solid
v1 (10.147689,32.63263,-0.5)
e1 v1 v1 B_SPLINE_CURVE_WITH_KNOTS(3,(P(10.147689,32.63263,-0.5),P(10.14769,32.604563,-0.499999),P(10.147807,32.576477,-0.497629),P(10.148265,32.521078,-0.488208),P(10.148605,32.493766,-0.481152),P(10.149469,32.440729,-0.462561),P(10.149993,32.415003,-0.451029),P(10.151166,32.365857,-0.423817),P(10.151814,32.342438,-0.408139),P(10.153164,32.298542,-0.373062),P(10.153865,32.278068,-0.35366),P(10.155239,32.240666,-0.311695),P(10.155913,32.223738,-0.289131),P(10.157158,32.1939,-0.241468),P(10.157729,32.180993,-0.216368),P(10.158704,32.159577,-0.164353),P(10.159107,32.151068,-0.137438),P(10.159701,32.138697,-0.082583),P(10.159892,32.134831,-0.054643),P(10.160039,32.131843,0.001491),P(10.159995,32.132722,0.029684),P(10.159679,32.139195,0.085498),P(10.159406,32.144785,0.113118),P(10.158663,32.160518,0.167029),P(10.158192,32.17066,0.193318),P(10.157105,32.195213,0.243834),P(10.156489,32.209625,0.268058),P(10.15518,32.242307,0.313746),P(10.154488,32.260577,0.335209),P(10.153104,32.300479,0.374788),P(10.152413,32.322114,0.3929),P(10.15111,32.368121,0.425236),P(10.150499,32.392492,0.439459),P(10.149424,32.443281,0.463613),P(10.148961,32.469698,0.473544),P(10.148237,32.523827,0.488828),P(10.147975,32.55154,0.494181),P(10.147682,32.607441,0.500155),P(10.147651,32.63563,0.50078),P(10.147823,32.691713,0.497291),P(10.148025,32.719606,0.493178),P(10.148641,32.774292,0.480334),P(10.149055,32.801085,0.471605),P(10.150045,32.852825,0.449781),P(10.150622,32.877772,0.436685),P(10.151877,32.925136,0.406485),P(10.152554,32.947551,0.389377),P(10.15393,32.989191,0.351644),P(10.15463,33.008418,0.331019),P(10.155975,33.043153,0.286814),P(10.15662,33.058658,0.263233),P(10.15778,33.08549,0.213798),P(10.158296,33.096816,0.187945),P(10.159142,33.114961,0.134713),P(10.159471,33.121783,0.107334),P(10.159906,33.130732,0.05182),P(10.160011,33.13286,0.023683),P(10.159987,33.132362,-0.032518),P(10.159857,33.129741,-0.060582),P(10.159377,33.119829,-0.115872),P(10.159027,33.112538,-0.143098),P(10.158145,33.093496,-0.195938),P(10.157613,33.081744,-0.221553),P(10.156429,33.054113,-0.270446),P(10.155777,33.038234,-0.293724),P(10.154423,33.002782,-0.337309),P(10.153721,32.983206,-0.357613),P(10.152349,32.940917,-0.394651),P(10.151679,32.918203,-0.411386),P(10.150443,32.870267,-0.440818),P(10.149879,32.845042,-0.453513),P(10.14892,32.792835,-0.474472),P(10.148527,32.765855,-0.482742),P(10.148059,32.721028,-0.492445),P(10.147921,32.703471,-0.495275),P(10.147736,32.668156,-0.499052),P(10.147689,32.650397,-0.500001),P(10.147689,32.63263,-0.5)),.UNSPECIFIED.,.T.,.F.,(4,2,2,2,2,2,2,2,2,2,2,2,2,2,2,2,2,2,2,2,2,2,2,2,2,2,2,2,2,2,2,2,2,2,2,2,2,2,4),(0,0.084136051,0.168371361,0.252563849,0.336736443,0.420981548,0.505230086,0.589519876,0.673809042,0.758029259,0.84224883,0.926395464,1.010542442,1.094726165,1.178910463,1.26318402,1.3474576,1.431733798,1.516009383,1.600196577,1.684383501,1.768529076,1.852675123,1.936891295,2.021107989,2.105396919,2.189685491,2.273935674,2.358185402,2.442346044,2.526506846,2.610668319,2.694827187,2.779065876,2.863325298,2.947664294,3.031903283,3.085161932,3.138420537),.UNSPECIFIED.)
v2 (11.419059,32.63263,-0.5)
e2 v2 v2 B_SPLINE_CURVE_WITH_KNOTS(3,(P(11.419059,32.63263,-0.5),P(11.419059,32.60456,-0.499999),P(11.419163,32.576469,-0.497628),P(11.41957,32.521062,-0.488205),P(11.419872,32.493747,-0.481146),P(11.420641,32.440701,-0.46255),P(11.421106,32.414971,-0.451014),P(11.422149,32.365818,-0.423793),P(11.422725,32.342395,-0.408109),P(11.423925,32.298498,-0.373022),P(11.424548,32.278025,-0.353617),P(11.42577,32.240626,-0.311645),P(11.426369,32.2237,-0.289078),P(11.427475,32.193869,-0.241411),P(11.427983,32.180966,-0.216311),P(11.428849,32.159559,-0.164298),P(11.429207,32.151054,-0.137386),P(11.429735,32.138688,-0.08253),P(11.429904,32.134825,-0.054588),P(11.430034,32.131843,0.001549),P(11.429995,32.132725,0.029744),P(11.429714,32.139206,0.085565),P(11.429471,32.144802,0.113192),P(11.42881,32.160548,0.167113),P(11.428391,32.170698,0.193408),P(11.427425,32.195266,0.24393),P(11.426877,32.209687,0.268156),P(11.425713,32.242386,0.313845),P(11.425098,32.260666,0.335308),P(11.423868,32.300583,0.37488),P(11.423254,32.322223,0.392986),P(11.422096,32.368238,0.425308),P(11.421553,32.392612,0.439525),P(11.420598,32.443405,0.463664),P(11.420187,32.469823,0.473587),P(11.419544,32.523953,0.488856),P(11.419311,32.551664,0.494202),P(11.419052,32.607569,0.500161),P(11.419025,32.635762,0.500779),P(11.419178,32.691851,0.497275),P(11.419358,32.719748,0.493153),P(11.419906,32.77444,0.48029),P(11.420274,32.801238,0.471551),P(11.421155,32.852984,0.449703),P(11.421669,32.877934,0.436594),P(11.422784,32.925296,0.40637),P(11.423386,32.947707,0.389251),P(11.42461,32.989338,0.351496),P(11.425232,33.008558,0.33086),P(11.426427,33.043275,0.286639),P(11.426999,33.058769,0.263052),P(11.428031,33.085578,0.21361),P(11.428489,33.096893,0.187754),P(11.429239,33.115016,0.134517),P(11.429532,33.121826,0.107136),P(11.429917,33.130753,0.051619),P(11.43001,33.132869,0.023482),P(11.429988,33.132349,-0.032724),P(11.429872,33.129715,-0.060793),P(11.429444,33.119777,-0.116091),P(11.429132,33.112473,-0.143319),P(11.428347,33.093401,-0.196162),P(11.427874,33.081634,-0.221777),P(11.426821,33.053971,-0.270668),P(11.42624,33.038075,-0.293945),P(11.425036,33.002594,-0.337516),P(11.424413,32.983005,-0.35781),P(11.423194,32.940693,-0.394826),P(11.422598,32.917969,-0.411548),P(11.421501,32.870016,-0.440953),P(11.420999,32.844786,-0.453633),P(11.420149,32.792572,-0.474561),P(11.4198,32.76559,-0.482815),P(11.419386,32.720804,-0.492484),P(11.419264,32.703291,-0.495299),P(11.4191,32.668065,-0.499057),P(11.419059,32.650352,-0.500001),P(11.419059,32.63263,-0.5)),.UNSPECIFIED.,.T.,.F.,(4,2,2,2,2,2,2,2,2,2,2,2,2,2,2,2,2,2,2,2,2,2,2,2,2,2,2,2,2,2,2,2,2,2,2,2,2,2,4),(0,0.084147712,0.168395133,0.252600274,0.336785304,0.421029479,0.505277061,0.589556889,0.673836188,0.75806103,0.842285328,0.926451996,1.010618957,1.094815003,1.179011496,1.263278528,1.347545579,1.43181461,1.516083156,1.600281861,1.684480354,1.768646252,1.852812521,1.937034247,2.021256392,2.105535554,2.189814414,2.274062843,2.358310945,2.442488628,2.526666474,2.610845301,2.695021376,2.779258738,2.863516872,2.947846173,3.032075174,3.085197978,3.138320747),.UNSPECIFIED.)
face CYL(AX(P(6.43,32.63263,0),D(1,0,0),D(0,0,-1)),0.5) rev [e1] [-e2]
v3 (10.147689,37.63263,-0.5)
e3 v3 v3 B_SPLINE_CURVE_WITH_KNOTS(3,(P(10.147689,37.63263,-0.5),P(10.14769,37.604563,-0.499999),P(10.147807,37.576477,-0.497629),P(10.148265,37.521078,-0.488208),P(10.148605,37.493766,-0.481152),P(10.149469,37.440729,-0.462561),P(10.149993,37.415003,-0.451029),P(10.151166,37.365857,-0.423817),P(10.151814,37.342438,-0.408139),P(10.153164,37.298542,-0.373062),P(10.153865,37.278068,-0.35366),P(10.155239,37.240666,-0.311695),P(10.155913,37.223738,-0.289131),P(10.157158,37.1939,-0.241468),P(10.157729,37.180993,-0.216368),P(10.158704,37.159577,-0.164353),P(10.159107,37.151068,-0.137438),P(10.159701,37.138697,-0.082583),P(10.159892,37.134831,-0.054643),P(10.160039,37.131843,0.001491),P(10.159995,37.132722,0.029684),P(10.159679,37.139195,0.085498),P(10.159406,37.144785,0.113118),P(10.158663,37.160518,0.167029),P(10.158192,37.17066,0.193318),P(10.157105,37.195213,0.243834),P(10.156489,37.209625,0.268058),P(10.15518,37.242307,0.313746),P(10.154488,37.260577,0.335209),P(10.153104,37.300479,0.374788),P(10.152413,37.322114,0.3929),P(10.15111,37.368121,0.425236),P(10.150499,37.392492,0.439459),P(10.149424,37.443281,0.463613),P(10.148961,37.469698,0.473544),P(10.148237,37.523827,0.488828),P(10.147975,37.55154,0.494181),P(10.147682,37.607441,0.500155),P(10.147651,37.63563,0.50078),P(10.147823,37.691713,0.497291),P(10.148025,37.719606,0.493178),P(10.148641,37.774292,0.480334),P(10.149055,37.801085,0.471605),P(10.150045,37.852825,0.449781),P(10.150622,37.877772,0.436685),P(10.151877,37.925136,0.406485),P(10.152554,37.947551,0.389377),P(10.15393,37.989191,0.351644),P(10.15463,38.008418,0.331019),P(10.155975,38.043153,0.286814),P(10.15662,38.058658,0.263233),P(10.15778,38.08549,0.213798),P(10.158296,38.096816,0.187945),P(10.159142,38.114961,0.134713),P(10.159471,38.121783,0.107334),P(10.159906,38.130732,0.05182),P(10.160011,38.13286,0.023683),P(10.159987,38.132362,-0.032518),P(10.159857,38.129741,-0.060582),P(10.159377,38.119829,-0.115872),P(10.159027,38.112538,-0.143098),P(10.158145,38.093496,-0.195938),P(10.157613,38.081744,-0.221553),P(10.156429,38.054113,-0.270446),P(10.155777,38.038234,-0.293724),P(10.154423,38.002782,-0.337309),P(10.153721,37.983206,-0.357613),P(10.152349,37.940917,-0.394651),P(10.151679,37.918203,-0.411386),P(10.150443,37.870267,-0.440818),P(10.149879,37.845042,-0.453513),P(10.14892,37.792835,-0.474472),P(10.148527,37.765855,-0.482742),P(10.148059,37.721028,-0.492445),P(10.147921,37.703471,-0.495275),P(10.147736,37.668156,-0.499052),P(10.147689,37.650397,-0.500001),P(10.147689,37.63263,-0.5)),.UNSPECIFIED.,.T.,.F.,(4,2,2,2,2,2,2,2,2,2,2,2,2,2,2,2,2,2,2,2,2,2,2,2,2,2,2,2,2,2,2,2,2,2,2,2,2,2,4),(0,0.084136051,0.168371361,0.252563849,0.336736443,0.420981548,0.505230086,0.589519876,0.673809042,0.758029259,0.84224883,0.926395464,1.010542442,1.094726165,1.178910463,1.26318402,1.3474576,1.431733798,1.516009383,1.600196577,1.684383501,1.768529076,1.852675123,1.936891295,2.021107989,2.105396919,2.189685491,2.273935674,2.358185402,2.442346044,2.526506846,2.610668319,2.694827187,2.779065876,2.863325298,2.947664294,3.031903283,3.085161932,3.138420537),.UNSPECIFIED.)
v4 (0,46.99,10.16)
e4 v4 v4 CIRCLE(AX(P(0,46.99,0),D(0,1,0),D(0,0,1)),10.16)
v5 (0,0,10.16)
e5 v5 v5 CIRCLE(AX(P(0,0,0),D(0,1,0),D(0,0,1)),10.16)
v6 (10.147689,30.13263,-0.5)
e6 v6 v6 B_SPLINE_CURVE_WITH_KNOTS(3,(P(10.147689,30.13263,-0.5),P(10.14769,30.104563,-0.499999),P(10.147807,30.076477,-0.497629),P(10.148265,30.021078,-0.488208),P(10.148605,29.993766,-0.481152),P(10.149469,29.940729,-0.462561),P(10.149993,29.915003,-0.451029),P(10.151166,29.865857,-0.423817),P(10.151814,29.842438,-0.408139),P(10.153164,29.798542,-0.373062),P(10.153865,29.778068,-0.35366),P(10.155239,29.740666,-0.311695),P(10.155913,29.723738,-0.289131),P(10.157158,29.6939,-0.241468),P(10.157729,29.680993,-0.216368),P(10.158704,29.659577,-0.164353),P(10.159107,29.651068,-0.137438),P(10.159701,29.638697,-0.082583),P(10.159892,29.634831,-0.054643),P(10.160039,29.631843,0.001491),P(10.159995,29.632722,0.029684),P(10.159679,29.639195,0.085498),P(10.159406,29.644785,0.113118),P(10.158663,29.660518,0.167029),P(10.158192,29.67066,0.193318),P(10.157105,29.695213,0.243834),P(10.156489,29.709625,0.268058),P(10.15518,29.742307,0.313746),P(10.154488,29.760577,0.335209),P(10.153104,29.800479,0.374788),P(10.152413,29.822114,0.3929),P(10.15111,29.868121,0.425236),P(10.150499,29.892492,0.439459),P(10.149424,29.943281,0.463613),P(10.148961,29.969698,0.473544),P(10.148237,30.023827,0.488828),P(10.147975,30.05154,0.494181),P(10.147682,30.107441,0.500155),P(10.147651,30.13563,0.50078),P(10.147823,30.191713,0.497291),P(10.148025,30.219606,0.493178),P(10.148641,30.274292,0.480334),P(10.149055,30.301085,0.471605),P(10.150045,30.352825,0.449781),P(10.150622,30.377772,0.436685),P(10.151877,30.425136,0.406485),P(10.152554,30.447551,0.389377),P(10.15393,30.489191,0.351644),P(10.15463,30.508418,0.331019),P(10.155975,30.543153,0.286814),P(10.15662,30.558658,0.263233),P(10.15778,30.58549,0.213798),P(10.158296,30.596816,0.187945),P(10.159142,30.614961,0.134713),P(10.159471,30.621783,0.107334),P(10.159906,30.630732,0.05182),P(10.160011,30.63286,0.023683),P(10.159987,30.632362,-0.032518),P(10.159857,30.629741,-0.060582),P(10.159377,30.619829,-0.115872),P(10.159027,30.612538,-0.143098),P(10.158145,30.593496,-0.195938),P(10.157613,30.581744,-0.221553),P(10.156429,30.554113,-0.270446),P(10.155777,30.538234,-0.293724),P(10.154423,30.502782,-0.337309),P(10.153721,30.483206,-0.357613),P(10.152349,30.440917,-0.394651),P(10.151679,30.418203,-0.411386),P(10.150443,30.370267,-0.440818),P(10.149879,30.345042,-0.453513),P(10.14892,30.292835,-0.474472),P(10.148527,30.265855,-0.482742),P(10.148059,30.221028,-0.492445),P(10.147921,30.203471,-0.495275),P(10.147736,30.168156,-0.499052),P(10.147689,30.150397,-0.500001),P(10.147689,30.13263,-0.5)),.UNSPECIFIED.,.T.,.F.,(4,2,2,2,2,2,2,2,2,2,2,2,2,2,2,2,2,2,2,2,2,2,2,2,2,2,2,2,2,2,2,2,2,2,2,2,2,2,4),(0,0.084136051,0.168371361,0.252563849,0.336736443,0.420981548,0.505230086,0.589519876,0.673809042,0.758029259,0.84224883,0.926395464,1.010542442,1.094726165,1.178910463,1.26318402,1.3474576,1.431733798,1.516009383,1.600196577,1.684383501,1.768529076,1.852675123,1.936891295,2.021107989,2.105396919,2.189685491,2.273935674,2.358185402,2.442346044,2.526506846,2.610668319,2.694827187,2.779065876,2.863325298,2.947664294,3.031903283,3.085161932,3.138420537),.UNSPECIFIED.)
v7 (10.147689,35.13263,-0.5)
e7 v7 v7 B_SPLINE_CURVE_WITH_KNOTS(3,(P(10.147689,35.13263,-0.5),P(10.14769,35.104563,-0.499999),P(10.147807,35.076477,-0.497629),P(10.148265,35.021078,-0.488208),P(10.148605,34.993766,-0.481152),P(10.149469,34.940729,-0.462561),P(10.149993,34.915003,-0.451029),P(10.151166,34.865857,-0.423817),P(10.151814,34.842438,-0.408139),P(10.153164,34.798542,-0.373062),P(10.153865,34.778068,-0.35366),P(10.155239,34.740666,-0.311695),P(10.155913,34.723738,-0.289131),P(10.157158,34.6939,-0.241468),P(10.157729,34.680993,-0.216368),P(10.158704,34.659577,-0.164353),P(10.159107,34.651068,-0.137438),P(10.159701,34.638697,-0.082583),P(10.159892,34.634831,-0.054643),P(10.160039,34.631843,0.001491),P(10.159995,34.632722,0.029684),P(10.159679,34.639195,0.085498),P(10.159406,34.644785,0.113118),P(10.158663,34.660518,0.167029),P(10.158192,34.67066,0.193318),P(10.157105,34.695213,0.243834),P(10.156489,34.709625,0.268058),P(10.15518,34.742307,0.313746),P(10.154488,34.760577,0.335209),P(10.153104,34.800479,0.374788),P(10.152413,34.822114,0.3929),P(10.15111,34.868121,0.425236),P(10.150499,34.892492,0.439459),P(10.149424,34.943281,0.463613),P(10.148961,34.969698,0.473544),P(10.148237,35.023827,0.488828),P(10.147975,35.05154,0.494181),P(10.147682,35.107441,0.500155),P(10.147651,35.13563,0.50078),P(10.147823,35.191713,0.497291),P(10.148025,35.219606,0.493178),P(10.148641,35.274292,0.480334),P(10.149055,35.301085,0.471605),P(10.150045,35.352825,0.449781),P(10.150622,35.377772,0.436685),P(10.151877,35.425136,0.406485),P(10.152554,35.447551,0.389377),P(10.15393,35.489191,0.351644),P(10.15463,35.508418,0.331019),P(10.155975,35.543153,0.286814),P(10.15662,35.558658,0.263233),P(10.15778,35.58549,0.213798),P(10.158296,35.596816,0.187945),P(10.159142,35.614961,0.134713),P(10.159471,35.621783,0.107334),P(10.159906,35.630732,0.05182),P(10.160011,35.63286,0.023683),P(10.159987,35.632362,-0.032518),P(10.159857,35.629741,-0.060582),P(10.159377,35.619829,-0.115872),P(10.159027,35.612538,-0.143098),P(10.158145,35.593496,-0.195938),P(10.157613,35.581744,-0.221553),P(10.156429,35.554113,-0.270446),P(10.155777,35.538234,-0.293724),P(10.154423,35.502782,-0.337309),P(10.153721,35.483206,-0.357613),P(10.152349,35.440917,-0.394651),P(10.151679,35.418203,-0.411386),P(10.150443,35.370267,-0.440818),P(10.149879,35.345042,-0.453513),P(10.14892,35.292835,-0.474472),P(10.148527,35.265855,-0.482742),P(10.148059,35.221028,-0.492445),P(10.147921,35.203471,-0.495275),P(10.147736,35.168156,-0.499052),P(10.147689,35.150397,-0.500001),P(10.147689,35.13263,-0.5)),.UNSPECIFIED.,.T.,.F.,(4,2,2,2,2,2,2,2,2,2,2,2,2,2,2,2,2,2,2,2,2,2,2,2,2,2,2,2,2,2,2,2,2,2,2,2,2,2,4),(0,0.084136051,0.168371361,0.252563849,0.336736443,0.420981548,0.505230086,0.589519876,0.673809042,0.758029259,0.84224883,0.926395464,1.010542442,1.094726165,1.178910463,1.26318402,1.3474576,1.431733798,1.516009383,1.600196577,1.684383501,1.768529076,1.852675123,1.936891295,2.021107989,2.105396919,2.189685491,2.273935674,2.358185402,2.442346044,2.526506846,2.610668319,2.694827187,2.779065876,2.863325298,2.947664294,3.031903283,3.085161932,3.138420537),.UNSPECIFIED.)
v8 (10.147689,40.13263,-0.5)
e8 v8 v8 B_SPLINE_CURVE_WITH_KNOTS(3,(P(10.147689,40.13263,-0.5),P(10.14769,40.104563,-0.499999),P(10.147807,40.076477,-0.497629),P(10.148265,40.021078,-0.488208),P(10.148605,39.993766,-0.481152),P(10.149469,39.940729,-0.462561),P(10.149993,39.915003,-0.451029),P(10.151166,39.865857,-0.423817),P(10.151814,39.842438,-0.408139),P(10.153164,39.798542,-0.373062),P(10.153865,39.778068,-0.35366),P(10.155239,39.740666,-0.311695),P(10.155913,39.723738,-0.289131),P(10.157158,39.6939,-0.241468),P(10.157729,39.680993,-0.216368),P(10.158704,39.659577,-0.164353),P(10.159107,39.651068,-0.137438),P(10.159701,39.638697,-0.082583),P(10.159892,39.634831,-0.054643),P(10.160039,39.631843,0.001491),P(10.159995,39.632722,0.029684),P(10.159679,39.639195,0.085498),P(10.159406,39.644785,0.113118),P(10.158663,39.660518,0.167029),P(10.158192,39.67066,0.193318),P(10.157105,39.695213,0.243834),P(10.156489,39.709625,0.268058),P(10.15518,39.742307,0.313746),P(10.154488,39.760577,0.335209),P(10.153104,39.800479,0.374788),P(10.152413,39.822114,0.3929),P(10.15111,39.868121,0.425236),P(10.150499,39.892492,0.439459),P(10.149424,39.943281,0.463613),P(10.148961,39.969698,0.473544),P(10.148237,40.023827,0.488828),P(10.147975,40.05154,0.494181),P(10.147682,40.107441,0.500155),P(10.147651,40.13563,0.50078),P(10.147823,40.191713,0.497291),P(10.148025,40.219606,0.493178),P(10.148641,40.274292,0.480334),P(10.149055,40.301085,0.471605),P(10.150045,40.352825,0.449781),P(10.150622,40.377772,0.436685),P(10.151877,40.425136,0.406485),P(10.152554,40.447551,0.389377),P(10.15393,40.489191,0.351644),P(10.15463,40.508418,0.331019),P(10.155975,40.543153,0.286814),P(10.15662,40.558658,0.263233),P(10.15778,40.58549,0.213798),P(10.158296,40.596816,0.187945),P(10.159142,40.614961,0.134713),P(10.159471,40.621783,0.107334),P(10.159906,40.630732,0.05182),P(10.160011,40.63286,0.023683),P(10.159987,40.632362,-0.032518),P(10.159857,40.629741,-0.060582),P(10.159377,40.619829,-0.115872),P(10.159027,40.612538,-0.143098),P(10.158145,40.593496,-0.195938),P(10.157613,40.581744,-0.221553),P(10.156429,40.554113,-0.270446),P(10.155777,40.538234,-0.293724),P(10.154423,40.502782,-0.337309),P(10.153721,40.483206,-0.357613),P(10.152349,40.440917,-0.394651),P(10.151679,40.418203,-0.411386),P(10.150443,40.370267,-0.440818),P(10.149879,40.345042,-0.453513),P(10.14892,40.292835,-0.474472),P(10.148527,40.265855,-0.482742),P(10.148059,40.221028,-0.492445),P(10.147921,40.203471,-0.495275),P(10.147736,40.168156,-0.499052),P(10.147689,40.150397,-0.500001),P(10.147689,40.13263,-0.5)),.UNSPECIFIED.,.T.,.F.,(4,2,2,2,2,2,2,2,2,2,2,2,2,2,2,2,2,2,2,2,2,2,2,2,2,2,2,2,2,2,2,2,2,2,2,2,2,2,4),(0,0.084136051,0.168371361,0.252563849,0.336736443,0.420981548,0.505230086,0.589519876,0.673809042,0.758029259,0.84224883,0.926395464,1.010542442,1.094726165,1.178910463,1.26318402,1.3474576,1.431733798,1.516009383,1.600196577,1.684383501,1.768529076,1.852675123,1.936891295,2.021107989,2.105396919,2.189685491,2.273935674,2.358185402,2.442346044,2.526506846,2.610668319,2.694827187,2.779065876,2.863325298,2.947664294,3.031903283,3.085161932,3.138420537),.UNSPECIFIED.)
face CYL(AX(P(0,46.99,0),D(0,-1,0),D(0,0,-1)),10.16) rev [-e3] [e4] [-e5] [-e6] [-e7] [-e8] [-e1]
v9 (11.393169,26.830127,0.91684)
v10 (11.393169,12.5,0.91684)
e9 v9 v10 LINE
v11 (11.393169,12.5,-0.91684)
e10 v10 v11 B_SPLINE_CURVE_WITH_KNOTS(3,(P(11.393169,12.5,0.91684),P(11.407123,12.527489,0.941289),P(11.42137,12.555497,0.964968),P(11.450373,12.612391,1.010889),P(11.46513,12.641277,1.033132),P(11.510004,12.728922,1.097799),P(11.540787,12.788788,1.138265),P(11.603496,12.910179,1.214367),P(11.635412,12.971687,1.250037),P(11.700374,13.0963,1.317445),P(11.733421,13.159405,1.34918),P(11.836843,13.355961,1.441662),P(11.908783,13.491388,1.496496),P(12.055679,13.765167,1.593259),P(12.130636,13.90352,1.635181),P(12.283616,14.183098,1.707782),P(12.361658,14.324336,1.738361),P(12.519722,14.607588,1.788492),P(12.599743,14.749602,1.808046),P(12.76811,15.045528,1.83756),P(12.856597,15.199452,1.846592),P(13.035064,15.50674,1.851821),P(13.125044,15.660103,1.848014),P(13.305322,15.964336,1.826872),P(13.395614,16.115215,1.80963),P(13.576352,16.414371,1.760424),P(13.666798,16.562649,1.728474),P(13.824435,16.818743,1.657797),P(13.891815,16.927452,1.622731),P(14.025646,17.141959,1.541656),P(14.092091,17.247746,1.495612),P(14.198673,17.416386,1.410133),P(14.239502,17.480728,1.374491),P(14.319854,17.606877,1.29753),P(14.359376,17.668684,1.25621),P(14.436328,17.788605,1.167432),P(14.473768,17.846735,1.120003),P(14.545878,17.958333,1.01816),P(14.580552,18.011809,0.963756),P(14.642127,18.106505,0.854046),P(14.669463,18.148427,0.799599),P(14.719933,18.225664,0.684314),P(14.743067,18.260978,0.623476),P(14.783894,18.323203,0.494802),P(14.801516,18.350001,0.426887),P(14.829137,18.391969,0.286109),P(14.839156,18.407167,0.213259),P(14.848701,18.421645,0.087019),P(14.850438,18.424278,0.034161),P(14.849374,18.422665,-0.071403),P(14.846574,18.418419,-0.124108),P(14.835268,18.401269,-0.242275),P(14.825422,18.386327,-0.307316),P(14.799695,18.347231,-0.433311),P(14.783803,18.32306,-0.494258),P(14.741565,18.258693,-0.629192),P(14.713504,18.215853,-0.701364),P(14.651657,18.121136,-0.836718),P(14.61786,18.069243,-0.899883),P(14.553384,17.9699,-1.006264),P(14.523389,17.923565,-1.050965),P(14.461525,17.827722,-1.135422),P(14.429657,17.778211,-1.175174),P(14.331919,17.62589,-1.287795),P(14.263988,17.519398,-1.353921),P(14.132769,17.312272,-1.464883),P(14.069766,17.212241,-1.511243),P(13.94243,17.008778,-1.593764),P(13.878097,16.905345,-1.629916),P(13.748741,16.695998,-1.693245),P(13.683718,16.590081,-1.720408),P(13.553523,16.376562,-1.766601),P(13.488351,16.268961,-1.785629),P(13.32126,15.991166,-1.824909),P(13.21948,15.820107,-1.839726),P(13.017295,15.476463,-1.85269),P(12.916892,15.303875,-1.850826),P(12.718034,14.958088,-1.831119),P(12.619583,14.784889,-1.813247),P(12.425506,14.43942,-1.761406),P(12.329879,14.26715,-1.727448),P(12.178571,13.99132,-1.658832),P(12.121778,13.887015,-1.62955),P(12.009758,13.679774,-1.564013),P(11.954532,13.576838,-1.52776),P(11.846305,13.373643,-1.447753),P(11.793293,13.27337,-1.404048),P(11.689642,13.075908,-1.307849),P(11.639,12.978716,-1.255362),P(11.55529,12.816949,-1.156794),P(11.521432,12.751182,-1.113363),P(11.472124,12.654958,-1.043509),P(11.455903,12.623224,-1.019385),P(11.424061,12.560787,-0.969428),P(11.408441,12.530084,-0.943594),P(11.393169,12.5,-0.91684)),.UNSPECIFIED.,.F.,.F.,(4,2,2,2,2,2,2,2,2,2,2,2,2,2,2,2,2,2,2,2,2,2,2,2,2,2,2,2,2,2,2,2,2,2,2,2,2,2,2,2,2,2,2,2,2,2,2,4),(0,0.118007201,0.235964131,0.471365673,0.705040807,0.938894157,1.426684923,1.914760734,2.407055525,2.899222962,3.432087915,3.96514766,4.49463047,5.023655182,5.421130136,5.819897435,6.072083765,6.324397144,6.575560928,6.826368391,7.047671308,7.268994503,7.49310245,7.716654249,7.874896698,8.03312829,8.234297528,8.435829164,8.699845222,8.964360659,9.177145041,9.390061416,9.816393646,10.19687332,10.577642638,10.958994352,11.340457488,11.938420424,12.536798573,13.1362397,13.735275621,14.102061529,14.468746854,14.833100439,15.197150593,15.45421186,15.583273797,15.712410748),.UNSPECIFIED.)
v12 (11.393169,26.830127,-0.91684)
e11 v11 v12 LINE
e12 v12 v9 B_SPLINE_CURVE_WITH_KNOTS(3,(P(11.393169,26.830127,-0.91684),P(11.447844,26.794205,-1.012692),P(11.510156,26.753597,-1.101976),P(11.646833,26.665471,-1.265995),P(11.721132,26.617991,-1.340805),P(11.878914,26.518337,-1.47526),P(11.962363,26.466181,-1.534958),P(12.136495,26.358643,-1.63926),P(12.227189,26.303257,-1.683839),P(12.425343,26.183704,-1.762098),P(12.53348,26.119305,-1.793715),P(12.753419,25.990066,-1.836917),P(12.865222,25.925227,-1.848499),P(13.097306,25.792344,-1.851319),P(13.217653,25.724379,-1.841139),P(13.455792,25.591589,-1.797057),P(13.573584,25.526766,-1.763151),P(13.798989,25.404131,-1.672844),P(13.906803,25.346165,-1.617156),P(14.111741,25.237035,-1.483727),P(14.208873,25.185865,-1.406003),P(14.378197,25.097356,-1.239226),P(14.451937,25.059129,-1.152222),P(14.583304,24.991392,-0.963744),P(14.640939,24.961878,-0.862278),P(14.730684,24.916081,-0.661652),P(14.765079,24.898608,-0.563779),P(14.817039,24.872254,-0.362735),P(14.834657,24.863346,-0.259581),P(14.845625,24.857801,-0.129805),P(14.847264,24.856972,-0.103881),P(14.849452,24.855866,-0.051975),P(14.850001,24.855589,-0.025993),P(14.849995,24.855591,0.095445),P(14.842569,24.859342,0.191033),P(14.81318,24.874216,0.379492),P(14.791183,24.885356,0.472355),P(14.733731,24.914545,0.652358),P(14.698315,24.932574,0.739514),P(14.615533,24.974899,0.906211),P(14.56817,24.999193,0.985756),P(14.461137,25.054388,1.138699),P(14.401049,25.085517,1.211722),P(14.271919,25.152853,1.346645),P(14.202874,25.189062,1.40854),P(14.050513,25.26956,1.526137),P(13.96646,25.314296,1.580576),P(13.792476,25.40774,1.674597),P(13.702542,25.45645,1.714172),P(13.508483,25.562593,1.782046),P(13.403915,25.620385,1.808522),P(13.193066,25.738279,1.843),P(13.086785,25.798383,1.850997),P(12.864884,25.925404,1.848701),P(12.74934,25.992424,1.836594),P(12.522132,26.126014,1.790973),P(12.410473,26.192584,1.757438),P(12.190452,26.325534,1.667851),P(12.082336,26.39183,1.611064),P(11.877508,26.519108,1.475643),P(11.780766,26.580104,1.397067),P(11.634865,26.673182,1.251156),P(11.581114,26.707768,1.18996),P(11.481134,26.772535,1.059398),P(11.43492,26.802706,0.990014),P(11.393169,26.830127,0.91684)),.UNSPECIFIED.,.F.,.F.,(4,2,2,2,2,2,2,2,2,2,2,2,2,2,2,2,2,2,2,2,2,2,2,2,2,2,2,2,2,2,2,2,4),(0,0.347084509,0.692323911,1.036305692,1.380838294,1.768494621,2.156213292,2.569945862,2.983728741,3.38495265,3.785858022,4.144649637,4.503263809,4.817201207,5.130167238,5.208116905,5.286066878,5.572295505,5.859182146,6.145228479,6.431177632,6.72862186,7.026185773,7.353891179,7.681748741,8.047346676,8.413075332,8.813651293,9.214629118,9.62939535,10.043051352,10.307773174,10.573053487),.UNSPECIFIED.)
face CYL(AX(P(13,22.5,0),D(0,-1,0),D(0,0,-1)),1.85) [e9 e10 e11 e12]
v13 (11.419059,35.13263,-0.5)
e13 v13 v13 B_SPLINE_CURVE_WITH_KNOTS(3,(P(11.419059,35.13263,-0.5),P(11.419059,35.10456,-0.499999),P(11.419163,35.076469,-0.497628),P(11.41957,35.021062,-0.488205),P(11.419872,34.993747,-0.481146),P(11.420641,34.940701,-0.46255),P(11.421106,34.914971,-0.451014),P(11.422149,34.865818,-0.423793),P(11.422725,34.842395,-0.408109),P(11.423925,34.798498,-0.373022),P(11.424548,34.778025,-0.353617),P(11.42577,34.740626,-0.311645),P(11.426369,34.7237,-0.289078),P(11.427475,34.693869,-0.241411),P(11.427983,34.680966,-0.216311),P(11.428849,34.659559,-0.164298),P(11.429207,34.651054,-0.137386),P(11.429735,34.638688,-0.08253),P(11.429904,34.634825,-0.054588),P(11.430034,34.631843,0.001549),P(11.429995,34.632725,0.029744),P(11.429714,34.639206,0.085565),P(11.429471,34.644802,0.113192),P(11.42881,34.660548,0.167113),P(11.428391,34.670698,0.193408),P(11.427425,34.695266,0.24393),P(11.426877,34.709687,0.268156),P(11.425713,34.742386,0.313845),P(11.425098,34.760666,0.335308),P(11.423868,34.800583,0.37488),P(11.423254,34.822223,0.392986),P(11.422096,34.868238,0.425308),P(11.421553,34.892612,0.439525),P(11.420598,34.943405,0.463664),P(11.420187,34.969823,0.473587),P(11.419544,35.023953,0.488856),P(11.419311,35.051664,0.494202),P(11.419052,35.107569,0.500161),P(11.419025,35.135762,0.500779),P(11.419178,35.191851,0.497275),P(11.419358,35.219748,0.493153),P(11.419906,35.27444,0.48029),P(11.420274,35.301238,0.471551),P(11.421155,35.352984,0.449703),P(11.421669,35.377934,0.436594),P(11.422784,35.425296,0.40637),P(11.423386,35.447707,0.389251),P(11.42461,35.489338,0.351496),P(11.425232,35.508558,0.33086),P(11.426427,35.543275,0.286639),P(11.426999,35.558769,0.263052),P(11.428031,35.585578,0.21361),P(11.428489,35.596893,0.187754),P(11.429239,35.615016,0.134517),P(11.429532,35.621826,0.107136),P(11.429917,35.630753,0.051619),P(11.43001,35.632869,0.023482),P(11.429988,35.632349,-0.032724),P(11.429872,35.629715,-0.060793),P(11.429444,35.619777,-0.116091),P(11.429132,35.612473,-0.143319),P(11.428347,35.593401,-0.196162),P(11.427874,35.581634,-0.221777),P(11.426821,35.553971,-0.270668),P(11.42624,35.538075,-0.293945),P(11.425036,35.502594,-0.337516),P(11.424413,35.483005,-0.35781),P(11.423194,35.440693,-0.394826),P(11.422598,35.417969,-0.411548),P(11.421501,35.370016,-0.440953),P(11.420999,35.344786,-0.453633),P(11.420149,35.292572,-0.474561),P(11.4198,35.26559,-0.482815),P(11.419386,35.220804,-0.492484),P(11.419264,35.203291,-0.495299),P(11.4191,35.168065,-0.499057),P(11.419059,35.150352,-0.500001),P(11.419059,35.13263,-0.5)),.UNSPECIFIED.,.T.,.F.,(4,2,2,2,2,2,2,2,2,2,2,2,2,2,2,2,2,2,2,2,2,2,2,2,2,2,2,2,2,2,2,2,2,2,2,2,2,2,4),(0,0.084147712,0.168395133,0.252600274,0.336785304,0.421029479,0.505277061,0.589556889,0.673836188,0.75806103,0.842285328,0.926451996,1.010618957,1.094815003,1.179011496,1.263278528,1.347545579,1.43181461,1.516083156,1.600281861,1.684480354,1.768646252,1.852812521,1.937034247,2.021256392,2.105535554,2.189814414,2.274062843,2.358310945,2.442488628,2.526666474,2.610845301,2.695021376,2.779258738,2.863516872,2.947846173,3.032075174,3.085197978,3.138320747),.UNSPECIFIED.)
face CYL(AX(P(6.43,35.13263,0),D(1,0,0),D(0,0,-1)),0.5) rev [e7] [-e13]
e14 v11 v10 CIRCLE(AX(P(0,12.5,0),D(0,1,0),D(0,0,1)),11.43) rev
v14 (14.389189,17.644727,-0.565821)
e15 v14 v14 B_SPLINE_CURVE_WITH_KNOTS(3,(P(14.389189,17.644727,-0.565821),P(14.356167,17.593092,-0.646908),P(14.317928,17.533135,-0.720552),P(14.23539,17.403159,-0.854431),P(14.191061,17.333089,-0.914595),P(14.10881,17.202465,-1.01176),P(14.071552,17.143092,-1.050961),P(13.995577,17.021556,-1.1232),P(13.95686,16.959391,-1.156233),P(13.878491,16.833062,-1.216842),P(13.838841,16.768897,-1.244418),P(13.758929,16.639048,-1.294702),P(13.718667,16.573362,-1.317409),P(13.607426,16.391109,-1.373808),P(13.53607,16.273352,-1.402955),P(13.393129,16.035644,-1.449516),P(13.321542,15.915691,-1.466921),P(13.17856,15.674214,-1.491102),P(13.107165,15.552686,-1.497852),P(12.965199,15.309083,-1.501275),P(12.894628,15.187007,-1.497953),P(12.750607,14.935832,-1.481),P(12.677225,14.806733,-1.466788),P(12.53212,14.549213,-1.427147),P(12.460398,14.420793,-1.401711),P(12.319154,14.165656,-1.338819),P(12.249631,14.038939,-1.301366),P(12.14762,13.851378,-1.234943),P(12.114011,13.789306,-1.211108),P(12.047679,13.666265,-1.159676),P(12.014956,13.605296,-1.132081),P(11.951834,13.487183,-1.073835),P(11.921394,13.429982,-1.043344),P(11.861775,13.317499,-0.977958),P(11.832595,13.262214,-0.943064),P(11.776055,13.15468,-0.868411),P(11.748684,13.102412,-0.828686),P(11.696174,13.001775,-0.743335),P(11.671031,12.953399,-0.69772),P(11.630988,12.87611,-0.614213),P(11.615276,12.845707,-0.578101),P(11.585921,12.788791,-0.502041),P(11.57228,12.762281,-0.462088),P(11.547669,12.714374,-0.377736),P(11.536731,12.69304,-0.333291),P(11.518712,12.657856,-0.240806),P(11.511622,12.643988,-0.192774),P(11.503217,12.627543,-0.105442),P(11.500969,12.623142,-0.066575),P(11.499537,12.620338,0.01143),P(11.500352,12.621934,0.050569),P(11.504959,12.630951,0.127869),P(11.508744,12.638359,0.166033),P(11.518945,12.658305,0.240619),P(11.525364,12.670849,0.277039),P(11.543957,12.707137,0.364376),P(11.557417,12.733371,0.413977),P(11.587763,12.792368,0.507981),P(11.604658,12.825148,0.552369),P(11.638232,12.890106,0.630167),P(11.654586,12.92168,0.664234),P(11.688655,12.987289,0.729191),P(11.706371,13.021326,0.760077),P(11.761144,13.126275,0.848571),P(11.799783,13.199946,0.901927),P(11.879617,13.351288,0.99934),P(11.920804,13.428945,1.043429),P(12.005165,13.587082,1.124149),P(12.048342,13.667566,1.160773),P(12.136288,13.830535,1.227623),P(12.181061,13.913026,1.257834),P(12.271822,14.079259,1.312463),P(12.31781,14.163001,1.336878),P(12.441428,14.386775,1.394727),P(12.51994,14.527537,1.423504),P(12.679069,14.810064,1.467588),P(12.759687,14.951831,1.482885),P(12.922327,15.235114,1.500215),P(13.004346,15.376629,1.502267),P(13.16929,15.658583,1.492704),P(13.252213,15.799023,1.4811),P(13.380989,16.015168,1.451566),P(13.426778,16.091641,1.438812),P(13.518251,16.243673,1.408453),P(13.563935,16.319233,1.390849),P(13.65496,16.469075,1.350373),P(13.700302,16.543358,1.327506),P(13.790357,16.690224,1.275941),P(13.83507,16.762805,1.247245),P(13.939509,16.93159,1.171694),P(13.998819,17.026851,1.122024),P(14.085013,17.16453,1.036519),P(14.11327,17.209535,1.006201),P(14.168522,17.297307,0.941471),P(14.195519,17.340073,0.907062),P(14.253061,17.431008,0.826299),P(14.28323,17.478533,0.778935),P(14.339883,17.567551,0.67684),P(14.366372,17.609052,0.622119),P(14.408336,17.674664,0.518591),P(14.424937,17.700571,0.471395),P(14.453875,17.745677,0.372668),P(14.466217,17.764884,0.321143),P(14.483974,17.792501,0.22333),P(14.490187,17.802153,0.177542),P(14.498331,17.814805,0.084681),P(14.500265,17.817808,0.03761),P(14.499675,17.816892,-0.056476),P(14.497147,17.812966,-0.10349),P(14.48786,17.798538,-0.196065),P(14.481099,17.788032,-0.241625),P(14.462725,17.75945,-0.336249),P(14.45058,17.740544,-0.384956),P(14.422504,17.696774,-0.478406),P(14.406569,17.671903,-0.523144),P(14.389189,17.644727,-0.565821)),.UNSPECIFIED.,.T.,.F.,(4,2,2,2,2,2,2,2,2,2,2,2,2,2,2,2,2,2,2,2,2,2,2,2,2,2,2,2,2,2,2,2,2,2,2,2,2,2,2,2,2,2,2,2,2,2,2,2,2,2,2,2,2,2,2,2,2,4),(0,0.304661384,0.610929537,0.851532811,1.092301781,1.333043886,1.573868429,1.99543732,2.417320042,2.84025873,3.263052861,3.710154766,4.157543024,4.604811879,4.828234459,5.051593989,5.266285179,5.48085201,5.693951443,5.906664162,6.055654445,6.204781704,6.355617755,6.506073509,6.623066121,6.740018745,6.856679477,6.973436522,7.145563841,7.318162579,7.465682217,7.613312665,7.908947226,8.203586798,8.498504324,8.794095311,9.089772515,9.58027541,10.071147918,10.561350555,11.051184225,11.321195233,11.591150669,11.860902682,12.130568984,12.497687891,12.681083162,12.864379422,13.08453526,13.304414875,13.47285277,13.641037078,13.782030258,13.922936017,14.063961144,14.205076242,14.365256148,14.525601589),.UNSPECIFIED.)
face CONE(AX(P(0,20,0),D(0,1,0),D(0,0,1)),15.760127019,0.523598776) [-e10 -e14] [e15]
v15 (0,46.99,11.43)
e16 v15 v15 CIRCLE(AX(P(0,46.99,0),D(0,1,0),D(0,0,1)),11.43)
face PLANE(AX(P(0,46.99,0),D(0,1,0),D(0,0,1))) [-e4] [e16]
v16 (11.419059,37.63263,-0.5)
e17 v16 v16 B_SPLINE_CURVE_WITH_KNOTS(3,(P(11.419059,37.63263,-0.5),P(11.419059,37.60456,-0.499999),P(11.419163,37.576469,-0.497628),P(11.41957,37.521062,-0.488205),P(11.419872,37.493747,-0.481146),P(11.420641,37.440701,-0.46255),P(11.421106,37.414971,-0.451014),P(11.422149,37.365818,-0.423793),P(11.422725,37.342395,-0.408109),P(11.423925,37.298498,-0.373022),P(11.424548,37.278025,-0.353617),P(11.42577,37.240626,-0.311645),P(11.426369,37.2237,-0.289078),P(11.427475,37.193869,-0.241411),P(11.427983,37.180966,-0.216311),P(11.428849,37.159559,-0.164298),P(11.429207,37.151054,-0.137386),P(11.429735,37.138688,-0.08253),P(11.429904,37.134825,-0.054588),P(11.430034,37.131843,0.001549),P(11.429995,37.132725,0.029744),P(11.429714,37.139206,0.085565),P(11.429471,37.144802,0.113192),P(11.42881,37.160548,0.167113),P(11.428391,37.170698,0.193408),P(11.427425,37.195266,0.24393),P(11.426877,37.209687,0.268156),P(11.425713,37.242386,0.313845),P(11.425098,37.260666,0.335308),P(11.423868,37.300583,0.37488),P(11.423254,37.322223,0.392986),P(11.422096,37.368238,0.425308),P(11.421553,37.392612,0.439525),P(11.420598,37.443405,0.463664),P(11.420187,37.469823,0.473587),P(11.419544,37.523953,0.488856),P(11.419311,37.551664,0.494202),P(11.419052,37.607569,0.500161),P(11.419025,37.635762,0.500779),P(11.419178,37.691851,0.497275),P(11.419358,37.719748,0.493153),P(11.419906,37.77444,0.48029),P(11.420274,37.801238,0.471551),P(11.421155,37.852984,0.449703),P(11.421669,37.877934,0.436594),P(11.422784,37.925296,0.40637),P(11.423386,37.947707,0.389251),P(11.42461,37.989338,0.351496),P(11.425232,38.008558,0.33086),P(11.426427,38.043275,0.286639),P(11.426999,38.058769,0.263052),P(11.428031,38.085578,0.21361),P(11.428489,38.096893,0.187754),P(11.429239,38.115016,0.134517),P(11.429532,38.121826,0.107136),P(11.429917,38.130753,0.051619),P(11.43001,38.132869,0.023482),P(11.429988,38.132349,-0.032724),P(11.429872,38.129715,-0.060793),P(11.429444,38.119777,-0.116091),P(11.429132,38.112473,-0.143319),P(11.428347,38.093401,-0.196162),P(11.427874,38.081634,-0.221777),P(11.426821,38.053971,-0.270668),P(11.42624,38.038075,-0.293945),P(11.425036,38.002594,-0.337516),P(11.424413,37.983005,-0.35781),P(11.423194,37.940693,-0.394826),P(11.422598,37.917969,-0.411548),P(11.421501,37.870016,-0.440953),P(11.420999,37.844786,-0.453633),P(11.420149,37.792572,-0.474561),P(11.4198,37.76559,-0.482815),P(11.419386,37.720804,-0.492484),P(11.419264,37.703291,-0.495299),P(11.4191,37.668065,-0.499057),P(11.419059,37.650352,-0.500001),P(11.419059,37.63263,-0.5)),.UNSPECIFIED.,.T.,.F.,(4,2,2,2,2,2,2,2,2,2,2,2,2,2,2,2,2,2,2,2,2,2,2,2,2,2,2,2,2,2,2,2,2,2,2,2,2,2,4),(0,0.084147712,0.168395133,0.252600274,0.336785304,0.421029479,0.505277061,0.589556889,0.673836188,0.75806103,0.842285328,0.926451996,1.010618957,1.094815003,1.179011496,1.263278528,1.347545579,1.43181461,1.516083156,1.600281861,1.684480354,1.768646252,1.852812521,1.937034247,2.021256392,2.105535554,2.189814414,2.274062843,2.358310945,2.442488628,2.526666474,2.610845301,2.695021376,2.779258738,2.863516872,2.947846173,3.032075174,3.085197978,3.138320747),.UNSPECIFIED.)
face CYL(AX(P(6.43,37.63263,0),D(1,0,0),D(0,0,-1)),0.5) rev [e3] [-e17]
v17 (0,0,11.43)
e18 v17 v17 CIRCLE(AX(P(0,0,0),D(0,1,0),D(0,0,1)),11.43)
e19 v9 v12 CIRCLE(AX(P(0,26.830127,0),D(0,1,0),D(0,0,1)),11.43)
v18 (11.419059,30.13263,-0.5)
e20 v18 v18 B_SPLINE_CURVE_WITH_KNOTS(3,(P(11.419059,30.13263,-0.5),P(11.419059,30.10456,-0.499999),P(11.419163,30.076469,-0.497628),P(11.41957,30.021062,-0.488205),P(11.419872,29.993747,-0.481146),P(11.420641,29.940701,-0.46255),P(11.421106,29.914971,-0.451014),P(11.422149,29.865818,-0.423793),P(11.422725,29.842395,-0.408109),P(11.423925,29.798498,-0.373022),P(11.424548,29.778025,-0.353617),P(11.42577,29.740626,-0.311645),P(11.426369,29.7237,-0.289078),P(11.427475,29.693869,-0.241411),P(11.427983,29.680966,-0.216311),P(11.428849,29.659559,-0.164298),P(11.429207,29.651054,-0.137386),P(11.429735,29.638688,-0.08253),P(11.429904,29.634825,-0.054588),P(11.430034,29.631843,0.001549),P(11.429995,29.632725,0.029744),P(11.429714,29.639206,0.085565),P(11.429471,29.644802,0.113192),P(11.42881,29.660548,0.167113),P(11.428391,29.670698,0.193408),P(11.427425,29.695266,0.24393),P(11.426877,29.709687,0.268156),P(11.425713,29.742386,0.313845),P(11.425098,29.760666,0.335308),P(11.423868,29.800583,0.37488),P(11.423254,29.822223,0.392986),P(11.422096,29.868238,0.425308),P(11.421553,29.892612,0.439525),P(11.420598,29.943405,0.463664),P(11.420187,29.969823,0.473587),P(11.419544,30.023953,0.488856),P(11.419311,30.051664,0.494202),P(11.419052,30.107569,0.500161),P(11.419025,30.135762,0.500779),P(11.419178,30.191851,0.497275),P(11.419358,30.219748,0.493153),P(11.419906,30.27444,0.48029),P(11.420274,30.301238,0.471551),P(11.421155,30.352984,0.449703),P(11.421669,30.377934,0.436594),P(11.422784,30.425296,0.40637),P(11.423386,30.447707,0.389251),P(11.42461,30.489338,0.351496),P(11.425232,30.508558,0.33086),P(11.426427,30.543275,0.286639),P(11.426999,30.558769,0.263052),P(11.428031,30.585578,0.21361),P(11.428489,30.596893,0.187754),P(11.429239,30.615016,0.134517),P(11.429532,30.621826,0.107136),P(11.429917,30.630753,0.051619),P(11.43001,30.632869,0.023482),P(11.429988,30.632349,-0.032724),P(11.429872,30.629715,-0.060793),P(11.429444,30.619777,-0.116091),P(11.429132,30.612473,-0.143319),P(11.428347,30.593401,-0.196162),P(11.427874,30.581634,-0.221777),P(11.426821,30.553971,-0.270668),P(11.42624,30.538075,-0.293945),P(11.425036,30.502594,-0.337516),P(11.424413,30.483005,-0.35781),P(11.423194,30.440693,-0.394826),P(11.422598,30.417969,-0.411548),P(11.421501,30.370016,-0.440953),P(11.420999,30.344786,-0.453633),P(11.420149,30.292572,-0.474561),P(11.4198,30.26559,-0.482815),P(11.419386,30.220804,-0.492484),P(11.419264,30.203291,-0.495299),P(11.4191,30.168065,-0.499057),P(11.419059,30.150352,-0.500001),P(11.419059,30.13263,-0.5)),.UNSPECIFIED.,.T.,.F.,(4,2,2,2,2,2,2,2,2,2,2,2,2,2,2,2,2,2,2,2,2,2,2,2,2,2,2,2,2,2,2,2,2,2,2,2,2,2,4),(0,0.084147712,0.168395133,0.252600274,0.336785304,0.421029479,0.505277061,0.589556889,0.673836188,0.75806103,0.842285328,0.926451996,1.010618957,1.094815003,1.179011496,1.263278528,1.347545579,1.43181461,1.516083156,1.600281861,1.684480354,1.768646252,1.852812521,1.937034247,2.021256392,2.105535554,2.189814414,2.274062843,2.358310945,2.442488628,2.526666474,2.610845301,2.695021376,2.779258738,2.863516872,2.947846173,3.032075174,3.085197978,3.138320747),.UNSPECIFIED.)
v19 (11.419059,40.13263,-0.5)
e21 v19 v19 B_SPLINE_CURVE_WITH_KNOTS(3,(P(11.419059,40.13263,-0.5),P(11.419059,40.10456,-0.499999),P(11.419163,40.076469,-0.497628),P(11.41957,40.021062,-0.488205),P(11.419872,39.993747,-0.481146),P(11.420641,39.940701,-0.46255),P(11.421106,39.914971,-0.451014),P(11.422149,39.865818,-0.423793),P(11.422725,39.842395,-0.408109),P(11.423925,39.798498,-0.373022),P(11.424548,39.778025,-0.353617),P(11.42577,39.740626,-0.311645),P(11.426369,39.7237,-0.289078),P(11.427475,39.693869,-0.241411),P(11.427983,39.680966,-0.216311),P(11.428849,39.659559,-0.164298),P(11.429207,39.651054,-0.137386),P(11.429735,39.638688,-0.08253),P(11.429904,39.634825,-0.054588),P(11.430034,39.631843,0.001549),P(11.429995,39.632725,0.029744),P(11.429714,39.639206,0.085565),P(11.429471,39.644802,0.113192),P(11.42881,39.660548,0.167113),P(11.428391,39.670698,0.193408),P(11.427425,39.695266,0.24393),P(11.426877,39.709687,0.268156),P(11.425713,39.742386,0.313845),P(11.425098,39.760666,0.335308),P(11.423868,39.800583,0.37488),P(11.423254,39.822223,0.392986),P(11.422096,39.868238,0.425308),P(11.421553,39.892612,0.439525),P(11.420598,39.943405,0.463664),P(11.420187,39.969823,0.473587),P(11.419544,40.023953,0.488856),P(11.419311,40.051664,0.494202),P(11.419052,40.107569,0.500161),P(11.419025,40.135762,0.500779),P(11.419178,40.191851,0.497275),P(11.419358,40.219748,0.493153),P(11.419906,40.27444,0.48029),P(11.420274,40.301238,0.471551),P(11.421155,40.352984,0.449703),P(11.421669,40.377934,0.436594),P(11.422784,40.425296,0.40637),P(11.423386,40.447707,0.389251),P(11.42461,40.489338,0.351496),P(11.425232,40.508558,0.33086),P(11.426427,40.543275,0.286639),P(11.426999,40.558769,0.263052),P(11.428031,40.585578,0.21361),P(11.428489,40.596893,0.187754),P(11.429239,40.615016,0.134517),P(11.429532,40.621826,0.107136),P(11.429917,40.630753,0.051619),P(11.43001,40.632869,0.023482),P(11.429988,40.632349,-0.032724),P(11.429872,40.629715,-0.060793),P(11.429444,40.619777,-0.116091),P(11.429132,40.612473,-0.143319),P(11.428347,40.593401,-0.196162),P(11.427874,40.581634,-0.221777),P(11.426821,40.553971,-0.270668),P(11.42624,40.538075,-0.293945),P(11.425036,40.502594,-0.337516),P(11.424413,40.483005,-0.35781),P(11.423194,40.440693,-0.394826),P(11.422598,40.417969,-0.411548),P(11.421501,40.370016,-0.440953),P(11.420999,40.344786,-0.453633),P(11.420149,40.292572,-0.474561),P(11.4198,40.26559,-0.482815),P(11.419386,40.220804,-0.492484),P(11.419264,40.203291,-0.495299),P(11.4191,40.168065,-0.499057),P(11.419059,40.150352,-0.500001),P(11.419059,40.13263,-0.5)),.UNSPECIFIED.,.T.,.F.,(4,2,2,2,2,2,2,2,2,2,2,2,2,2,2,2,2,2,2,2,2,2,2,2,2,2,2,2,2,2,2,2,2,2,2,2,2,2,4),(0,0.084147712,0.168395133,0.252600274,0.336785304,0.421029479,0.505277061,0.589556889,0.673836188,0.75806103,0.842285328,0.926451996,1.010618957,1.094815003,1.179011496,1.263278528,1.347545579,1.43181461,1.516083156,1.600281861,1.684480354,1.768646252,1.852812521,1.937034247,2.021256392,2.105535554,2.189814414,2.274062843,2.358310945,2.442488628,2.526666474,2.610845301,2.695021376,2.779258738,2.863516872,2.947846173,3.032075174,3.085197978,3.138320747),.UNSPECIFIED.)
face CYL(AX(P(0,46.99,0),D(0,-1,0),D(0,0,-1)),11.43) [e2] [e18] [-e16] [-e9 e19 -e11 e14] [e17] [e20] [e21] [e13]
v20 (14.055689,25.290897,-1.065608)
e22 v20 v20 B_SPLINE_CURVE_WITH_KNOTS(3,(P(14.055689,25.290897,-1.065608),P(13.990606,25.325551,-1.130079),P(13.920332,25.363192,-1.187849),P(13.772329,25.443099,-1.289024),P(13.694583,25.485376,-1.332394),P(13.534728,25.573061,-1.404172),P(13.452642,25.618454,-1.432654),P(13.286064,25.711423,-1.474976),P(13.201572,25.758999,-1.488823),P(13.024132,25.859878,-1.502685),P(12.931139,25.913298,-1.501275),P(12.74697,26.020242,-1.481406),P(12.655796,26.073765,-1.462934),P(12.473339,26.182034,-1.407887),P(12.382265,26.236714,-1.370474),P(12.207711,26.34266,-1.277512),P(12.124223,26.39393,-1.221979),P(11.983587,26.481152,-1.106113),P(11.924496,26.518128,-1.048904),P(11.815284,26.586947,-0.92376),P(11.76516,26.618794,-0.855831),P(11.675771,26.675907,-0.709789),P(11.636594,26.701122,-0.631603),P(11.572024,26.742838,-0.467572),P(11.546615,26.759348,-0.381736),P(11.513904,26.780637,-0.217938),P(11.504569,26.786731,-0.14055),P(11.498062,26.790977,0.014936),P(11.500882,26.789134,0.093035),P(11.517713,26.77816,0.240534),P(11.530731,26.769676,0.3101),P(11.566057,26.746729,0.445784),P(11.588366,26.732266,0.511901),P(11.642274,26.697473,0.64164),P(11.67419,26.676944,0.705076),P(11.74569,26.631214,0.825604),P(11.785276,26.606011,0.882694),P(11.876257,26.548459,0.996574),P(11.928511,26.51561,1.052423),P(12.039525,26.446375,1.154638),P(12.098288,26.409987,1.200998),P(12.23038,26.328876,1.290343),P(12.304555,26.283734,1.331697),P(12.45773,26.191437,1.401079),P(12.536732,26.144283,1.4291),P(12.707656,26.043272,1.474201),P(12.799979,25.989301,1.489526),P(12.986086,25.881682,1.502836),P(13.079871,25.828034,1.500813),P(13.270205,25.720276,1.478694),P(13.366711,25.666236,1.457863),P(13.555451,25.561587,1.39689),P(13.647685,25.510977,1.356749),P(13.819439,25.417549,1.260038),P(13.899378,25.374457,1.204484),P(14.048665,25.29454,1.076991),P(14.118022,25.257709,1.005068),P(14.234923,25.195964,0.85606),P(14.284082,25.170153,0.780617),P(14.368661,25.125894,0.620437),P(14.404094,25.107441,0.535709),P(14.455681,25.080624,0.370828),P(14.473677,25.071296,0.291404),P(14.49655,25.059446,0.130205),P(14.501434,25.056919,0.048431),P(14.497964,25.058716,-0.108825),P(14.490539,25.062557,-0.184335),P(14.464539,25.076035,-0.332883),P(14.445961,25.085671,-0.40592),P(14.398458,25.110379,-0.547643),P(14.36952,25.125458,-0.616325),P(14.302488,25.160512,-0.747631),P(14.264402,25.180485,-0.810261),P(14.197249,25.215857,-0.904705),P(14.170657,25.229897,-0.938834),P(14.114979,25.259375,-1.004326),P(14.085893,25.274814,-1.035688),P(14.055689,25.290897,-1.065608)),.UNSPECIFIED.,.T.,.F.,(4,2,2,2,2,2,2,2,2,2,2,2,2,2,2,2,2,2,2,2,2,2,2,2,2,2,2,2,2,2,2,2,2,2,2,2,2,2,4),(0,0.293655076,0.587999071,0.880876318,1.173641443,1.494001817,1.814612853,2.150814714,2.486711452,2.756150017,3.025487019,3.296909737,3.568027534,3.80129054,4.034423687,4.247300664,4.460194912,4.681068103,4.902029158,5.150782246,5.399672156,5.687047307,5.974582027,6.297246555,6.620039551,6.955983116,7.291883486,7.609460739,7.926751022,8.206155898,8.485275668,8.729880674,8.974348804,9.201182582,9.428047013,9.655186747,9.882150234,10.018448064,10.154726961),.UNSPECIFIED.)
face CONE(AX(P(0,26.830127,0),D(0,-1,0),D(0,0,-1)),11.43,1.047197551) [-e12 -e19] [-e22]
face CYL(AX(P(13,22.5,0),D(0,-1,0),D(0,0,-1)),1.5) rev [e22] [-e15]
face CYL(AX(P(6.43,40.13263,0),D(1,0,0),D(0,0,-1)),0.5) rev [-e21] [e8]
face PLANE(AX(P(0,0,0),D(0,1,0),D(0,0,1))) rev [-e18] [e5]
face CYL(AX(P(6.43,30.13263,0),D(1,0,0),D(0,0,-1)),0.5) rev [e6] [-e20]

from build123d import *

# Parameters (mm, degrees)
SKETCH1_R           = 11.43
SKETCH1_R_2         = 10.16
BOSS_EXTRUDE1_DEPTH = 46.99
BOSS_EXTRUDE2_START = 20
SKETCH3_R           = 1.85
SKETCH3_R_2         = 1.5
BOSS_EXTRUDE2_DEPTH = 2.5
CHAMFER4_SIZE       = 7.5
CHAMFER4_SIZE_2     = 4.330127019
CHAMFER5_SIZE       = 7.5
CHAMFER5_SIZE_2     = 4.330127019
SKETCH4_R           = 0.5
CUT_EXTRUDE1_DEPTH  = 5


with BuildPart() as part:
    # Sketch1 → Boss-Extrude1 (new body)
    with BuildSketch(Plane(origin=(0, 0, 0), x_dir=(1, 0, 0), z_dir=(0, 1, 0))):
        with Locations(Location((0, 0, 0), (0, 0, 270))):
            Circle(SKETCH1_R)
        with Locations(Location((0, 0, 0), (0, 0, 270))):
            Circle(SKETCH1_R_2, mode=Mode.SUBTRACT)
    extrude(amount=BOSS_EXTRUDE1_DEPTH)

    # Sketch3 → Boss-Extrude2 (add)
    with BuildSketch(Plane(origin=(0, 0, 0), x_dir=(1, 0, 0), z_dir=(0, 1, 0)).offset(BOSS_EXTRUDE2_START)):
        with Locations((13, 0)):
            Circle(SKETCH3_R)
        with Locations(Location((13, 0, 0), (0, 0, 270))):
            Circle(SKETCH3_R_2, mode=Mode.SUBTRACT)
    extrude(amount=BOSS_EXTRUDE2_DEPTH)

    # Chamfer4
    # the kernel refuses this chamfer: 7.5, 4.330127019 mm, written as the material it adds along each edge
    with BuildSketch(Plane(origin=(0, 20, 0), x_dir=(-0.2055966456613654, 0, -0.9786368168492308), z_dir=(-0.9786368168492308, 0, 0.2055966456613654))) as chamfer4_piece_1_section:
        Polygon((11.43, CHAMFER4_SIZE), (11.43 + CHAMFER4_SIZE_2, 0), (11.43, 0), align=None)
    chamfer4_piece_1 = revolve(axis=Axis((0, 20, 0), (0, -1, 0)), revolution_arc=203.728856682, mode=Mode.PRIVATE)
    chamfer4_piece_1 = chamfer4_piece_1 - Plane(origin=(13, 13.499486396, 0), x_dir=(0, 0, 1), z_dir=(0, -1, 0)) * Cylinder(1.5, 64, mode=Mode.PRIVATE)
    chamfer4_piece_1 = chamfer4_piece_1 & Plane(origin=(13, 13.499486396, 0), x_dir=(1, 0, 0), z_dir=(0, -1, 0)) * Cylinder(1.85, 64, mode=Mode.PRIVATE)
    add(chamfer4_piece_1)

    # Chamfer5
    # the kernel refuses this chamfer: 7.5, 4.330127019 mm, written as the material it adds along each edge
    with BuildSketch(Plane(origin=(0, 22.5, 0), x_dir=(-0.20559664566136496, 0, -0.9786368168492309), z_dir=(-0.9786368168492309, 0, 0.20559664566136496))) as chamfer5_piece_1_section:
        Polygon((11.43 + CHAMFER5_SIZE, 0), (11.43, -CHAMFER5_SIZE_2), (11.43, 0), align=None)
    chamfer5_piece_1 = revolve(axis=Axis((0, 22.5, 0), (0, -1, 0)), revolution_arc=203.728856682, mode=Mode.PRIVATE)
    chamfer5_piece_1 = chamfer5_piece_1 - Plane(origin=(13, 25.165434587, 0), x_dir=(0, 0, 1), z_dir=(0, -1, 0)) * Cylinder(1.5, 76, mode=Mode.PRIVATE)
    chamfer5_piece_1 = chamfer5_piece_1 & Plane(origin=(13, 25.165434587, 0), x_dir=(1, 0, 0), z_dir=(0, -1, 0)) * Cylinder(1.85, 76, mode=Mode.PRIVATE)
    add(chamfer5_piece_1)

    # Sketch4 → Cut-Extrude1 (cut)
    with BuildSketch(Plane(origin=(11.43, 0, 0), x_dir=(0, 0, -1), z_dir=(1, 0, 0))):
        with Locations((0, 30.132630437)):
            Circle(SKETCH4_R)
        with Locations((0, 32.632630437)):
            Circle(SKETCH4_R)
        with Locations((0, 35.132630437)):
            Circle(SKETCH4_R)
        with Locations((0, 37.632630437)):
            Circle(SKETCH4_R)
        with Locations((0, 40.132630437)):
            Circle(SKETCH4_R)
    extrude(amount=-CUT_EXTRUDE1_DEPTH, mode=Mode.SUBTRACT)


solid = part.part
